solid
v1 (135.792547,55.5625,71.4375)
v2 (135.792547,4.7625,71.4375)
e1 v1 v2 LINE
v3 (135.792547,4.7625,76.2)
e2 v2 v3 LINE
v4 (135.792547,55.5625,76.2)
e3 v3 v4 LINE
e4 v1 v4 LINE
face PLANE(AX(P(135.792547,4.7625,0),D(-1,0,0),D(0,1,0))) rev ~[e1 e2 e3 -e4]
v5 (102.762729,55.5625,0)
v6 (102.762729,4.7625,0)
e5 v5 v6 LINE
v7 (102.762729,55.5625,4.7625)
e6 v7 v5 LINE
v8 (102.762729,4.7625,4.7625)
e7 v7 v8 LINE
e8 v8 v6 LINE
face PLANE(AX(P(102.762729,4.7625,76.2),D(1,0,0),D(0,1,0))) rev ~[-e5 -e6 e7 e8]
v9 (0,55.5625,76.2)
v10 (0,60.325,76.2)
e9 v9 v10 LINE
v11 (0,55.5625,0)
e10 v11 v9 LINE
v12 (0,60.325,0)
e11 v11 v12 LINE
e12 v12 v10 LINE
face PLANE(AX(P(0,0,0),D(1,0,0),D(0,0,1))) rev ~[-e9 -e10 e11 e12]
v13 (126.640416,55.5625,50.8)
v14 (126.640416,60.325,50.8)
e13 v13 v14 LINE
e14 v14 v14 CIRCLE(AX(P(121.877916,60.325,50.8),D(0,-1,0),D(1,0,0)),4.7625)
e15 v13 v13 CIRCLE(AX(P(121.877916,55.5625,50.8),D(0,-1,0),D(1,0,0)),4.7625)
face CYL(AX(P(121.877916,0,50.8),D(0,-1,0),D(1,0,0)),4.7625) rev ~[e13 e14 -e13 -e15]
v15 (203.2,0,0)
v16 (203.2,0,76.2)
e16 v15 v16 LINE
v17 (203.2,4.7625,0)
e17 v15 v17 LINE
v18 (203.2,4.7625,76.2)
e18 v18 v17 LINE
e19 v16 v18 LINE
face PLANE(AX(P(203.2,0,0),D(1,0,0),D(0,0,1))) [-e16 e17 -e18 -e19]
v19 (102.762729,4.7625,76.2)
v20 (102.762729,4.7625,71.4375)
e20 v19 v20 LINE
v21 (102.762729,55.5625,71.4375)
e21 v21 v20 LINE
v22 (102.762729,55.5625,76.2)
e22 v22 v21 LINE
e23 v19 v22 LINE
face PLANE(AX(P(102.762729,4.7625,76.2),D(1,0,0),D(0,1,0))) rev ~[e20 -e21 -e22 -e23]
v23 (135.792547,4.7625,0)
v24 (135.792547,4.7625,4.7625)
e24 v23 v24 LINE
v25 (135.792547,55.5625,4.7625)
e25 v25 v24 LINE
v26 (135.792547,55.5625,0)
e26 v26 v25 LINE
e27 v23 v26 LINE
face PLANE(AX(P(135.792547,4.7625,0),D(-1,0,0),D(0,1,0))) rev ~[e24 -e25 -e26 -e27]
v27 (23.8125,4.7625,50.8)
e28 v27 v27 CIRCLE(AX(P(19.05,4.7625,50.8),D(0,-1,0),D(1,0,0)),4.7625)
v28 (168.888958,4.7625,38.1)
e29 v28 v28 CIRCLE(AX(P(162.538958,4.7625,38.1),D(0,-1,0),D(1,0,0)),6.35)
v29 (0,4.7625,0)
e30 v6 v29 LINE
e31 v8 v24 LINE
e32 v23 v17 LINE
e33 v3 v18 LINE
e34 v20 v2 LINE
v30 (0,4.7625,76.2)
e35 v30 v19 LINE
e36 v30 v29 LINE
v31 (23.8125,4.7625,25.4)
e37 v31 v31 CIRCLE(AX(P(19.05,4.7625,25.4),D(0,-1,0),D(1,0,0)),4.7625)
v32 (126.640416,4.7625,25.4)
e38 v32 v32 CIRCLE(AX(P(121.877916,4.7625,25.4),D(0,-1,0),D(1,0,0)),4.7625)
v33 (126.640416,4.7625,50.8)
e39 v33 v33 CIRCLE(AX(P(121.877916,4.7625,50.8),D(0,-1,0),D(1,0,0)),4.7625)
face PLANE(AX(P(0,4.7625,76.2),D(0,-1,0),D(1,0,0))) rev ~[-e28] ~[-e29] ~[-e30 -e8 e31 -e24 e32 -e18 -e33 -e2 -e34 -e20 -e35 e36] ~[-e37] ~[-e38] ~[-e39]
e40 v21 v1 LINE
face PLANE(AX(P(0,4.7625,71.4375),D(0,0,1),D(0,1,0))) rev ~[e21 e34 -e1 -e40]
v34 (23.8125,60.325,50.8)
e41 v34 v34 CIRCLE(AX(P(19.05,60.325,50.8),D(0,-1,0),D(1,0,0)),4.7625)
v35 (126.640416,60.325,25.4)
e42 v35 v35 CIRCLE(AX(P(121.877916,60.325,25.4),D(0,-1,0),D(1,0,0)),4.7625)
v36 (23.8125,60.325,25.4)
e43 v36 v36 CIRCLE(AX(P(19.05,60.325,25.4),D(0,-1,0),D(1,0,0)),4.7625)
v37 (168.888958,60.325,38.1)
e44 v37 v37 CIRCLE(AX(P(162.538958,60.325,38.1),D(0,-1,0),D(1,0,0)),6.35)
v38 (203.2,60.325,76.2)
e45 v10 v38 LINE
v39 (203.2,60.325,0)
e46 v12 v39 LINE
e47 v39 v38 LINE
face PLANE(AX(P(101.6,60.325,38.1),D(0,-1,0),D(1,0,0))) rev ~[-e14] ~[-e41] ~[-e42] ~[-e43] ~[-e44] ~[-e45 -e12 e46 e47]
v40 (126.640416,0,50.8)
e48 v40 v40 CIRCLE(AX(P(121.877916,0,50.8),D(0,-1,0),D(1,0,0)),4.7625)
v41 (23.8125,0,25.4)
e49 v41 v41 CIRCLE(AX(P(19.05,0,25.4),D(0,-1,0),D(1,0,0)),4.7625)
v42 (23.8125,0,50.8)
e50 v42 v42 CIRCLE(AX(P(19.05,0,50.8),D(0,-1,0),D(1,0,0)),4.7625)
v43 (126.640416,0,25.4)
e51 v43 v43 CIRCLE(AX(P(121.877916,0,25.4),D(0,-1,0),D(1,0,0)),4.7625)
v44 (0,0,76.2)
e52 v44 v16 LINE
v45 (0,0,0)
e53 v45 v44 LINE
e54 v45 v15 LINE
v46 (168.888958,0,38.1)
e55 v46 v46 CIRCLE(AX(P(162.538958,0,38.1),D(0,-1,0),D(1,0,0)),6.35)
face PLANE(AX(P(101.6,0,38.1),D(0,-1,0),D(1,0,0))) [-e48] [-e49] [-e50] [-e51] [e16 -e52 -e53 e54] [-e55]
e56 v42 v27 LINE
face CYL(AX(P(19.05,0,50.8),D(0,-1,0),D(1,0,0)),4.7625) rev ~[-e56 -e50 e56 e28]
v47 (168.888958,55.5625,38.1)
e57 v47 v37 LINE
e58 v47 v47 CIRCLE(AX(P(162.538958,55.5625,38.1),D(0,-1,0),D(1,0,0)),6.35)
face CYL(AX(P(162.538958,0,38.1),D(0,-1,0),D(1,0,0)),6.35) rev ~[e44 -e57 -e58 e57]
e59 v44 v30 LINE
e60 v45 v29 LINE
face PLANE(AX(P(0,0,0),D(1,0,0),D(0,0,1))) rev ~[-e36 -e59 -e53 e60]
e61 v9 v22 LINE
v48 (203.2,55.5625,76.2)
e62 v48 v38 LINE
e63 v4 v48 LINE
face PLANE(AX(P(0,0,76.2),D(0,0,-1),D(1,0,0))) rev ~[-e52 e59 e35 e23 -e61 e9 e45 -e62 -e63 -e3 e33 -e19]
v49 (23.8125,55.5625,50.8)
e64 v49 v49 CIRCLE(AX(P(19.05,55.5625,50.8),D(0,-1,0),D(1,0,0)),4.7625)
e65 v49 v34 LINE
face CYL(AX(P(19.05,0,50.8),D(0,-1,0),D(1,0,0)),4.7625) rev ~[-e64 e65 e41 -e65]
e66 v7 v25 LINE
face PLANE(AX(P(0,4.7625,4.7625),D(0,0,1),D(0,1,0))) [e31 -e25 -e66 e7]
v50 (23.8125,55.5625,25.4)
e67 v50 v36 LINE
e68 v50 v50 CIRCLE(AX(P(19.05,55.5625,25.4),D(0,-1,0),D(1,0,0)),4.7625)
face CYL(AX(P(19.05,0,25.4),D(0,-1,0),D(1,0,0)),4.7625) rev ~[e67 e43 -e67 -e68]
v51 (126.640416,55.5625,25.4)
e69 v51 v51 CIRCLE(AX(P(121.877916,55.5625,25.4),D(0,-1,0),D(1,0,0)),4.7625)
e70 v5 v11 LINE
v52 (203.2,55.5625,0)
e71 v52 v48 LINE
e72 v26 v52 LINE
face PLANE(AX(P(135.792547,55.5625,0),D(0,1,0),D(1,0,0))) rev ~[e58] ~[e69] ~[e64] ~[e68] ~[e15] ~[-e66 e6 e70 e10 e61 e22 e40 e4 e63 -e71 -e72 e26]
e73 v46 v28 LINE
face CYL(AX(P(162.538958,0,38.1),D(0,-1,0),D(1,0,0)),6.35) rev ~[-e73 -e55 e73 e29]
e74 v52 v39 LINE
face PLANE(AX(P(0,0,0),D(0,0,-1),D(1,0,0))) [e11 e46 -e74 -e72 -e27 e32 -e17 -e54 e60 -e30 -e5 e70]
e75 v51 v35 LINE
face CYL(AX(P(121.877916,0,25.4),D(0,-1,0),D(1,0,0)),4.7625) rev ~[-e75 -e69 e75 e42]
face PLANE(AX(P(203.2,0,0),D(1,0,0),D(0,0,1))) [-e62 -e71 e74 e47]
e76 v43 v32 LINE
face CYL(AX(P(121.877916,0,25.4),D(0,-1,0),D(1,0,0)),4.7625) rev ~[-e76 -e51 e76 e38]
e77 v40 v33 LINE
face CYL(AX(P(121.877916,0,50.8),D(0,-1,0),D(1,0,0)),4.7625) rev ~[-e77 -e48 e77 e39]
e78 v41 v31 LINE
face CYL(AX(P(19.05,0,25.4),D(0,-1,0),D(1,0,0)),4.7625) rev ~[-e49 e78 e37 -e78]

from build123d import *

# Parameters (mm, degrees)
F0_W     = 203.2
F0_H     = 76.2
F0_R     = 4.7625
F0_R_2   = 6.35
F1_DEPTH = 60.325
F3_W     = 102.7627293737
F3_H     = 50.8
F4_DEPTH = 85.725
F5_W     = 50.8
F5_H     = 66.675
F6_DEPTH = 203.2
F7_W     = 67.4074530634
F7_H     = 50.8
F8_DEPTH = 76.2


with BuildPart() as f1:
    # F0 (on Front) → F1 (new body)
    with BuildSketch(Plane.XZ):
        with Locations((101.6, 38.1)):
            Rectangle(F0_W, F0_H)
        with Locations((19.05, 25.4)):
            Circle(F0_R, mode=Mode.SUBTRACT)
        with Locations((121.8779161572, 25.4)):
            Circle(F0_R, mode=Mode.SUBTRACT)
        with Locations((19.05, 50.8)):
            Circle(F0_R, mode=Mode.SUBTRACT)
        with Locations((121.8779161572, 50.8)):
            Circle(F0_R, mode=Mode.SUBTRACT)
        with Locations((162.5389580786, 38.1)):
            Circle(F0_R_2, mode=Mode.SUBTRACT)
    extrude(amount=-F1_DEPTH)

    # F3 (on offset) → F4 (cut)
    with BuildSketch(Plane.XY.offset(76.2)):
        with Locations((51.3813646869, 30.1625)):
            Rectangle(F3_W, F3_H)
    extrude(amount=-F4_DEPTH, mode=Mode.SUBTRACT)

    # F5 (on Right) → F6 (cut)
    with BuildSketch(Plane.YZ):
        with Locations((30.1625, 38.1)):
            Rectangle(F5_W, F5_H)
    extrude(amount=F6_DEPTH, mode=Mode.SUBTRACT)

    # F7 (on Top) → F8 (cut)
    with BuildSketch(Plane.XY):
        with Locations((169.4962734683, 30.1625)):
            Rectangle(F7_W, F7_H)
    extrude(amount=F8_DEPTH, mode=Mode.SUBTRACT)


solid = f1.part
